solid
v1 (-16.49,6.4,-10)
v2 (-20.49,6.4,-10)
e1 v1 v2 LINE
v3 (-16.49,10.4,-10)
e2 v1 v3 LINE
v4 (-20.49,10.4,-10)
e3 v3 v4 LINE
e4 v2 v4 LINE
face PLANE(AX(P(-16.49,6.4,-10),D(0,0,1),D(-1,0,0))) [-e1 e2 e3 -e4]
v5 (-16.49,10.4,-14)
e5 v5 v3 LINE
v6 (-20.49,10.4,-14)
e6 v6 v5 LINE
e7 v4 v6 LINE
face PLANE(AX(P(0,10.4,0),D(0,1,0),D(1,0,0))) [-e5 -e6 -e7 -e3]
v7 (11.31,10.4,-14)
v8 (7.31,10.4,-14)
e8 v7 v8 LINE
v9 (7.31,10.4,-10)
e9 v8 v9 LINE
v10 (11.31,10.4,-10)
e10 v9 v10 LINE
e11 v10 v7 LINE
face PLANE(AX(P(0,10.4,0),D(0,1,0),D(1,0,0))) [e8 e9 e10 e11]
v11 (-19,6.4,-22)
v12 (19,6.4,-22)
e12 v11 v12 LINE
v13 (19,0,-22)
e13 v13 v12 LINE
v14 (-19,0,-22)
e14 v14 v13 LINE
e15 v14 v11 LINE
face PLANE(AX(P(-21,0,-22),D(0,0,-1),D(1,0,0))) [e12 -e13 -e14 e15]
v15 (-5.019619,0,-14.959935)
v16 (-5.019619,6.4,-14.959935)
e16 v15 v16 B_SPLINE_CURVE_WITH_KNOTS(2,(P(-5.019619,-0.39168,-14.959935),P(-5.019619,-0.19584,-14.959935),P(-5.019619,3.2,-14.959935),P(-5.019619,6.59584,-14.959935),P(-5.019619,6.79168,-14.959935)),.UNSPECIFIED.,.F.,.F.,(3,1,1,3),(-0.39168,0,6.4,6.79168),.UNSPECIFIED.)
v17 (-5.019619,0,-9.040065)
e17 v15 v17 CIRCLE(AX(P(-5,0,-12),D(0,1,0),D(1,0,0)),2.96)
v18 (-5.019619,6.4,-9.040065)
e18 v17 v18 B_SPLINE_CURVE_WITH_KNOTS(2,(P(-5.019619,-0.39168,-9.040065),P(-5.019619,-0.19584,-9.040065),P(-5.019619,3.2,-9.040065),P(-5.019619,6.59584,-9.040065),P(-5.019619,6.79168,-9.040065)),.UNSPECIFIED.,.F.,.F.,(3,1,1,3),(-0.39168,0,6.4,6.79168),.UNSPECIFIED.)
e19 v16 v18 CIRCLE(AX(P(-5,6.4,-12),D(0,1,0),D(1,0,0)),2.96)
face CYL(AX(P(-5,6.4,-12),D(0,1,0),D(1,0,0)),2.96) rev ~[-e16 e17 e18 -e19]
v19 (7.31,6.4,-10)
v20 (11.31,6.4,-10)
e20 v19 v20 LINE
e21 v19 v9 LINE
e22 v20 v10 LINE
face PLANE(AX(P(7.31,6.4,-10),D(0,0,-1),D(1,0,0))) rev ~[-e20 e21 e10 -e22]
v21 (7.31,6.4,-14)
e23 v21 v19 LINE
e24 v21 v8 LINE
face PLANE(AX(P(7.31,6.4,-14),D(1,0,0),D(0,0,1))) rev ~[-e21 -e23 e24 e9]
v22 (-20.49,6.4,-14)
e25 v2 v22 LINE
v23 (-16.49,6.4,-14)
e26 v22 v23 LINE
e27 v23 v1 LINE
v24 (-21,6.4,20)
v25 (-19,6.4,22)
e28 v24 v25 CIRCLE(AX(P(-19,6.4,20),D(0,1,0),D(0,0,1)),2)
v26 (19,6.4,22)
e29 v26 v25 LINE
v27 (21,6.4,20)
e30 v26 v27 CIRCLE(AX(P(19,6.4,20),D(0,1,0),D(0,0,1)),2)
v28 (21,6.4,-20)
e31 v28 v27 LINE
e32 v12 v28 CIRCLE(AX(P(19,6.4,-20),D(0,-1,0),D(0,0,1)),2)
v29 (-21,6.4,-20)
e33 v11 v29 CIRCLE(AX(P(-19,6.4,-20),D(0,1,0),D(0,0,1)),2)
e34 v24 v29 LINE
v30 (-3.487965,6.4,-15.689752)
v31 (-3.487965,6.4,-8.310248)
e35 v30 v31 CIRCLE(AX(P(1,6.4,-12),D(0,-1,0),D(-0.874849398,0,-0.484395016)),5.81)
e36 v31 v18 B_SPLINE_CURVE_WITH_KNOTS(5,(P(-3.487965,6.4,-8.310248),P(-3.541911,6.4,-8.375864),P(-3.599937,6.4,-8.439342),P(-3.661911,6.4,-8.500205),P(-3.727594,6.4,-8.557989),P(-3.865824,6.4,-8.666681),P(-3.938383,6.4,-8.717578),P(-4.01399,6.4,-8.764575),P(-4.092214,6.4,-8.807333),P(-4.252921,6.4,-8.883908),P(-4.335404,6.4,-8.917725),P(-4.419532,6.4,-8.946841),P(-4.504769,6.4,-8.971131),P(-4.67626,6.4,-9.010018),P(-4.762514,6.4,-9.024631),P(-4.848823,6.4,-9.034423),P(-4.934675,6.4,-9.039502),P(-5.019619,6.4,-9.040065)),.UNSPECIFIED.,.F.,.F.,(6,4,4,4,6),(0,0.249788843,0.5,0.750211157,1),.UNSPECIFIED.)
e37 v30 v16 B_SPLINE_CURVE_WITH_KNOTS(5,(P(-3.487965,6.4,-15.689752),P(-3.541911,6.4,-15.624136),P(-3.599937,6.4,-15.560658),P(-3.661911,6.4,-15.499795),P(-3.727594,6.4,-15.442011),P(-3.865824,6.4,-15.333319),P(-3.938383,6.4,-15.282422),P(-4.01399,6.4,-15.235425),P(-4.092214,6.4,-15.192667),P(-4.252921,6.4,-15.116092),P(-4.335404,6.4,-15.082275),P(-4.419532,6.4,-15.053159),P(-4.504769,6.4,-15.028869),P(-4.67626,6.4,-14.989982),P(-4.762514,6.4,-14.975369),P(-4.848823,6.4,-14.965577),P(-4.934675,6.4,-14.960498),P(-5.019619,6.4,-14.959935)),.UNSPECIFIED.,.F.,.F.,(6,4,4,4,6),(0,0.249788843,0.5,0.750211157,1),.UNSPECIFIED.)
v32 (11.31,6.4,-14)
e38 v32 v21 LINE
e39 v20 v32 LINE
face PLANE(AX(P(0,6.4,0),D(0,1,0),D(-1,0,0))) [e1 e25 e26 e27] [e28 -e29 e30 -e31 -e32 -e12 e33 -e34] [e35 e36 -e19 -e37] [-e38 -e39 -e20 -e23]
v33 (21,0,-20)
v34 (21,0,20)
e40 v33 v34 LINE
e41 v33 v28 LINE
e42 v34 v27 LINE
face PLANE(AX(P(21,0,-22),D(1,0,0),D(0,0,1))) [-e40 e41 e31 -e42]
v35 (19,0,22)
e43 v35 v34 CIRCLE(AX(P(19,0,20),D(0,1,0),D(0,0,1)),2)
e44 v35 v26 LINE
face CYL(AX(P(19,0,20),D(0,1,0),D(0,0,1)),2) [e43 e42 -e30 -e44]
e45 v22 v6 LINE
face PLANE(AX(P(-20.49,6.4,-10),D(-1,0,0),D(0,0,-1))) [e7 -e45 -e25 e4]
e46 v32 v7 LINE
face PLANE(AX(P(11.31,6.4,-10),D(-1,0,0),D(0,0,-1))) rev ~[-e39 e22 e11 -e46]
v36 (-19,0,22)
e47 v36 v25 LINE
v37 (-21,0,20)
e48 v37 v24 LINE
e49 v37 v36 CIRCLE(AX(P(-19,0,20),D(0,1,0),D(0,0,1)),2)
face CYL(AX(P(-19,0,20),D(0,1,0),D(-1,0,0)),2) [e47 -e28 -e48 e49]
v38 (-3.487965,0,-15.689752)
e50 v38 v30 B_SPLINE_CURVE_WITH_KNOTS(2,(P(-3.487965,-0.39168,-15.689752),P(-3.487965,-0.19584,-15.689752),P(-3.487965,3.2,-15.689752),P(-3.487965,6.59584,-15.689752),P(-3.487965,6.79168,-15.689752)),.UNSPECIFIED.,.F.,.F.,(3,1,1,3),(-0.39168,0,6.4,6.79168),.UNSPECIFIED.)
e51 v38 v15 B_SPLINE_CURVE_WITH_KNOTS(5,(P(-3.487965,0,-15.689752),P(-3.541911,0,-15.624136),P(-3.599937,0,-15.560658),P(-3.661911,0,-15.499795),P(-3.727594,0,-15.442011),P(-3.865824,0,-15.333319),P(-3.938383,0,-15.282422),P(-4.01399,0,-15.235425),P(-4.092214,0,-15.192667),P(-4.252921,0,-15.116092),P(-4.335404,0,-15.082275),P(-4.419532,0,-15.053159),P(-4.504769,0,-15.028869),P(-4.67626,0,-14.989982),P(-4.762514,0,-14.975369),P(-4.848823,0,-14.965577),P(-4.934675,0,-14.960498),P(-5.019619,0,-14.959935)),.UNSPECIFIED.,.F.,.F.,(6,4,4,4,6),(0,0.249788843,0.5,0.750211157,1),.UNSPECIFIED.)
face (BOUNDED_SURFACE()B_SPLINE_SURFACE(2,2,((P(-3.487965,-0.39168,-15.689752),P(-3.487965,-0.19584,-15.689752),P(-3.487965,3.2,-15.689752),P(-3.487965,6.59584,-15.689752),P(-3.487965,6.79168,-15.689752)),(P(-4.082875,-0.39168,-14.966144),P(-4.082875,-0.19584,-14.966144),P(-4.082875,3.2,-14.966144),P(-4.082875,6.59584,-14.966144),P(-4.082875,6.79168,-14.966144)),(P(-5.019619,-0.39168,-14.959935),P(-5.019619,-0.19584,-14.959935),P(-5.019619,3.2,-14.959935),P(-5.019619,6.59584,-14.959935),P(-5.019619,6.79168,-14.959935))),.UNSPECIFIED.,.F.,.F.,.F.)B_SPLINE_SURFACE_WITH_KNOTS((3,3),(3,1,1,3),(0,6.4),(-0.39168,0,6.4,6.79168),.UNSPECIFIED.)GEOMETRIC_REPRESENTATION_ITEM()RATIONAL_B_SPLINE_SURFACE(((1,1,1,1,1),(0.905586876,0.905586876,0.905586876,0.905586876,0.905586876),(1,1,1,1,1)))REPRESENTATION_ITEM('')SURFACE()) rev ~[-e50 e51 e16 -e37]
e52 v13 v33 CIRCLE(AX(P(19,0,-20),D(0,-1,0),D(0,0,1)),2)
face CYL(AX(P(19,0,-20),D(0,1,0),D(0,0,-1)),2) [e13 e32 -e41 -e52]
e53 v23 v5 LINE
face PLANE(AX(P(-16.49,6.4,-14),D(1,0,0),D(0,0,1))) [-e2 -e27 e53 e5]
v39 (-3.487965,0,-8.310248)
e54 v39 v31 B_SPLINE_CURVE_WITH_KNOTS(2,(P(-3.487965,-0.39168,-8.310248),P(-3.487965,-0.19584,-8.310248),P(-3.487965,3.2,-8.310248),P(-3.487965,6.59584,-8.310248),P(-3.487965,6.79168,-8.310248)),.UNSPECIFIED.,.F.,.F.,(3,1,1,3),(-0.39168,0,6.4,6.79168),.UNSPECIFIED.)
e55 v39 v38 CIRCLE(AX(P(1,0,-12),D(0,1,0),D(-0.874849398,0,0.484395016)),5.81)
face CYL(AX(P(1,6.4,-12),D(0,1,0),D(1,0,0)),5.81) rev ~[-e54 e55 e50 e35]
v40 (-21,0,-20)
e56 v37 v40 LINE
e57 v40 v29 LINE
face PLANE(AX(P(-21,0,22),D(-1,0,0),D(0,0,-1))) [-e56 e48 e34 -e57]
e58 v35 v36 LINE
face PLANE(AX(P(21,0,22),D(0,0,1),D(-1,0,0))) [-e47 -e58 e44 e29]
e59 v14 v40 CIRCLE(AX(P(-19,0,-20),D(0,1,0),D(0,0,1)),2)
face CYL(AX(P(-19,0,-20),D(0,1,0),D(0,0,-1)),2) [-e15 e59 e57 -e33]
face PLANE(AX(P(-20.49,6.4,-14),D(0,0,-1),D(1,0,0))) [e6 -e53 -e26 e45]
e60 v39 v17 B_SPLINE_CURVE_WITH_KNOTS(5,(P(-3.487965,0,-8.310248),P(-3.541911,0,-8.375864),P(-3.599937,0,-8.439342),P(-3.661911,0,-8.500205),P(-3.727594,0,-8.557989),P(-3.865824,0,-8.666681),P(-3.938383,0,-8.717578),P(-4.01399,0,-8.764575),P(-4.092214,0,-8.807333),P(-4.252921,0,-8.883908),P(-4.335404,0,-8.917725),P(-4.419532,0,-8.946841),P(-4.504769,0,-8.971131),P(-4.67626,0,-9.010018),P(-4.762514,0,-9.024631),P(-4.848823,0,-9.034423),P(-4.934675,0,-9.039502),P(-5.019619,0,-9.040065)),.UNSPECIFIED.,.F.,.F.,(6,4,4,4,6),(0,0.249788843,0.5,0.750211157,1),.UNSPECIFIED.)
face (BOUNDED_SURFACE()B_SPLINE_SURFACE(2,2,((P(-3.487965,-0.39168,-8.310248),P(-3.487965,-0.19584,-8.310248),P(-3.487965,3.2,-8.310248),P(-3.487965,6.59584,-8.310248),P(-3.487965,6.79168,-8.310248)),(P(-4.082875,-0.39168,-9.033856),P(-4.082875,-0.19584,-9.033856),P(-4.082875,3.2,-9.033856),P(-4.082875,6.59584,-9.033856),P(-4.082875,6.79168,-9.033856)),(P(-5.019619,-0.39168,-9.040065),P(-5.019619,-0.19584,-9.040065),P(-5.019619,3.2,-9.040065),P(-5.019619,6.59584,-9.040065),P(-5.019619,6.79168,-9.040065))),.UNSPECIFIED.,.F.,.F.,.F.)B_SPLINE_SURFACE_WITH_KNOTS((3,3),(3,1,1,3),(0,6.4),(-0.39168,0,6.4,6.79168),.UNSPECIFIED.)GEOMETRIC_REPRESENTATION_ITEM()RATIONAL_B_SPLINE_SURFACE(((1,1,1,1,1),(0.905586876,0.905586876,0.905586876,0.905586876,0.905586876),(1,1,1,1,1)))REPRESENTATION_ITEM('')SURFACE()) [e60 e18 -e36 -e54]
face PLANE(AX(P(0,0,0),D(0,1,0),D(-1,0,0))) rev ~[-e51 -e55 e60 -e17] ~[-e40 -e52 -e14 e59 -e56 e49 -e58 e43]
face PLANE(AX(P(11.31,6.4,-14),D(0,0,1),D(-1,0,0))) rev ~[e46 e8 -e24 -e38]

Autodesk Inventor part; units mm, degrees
ref_plane "YZ Plane" through (0, 0, 0) normal (1, 0, 0) x (0, 1, 0)
ref_plane "XZ Plane" through (0, 0, 0) normal (0, 1, 0) x (-1, 0, 0)
ref_plane "XY Plane" through (0, 0, 0) normal (0, 0, 1) x (1, 0, 0)
sketch "Sketch1" plane through (0, 0, 0) normal (0, 1, 0) x (-1, 0, 0)
  line L0 (-21, 22) -> (21, 22)
  line L1 (21, 22) -> (21, -22)
  line L2 (21, -22) -> (-21, -22)
  line L3 (-21, -22) -> (-21, 22)
  line L4 (-21, 22) -> (21, -22) construction
  line L5 (21, 22) -> (-21, -22) construction
  point P0 (0, 0)
  dimension "d0" = 42
  dimension "d1" = 44
extrude "wall2" add sketch "Sketch1" along normal blind 6.4
sketch "Sketch7" plane through (0, 6.4, 0) normal (0, 1, 0) x (1, 0, 0)
  line L0 (1, -22) -> (1, 22) construction
  line L1 (21, 22) -> (-21, 22) projected
  line L2 (-21, -22) -> (21, -22) projected
  line L3 (-21, 12) -> (21, 12) construction
  line L4 (21, -22) -> (21, 22) projected
  line L5 (-21, 22) -> (-21, -22) projected
  circle A0 centre (1, 12) radius 5.81
  point P0 (0, 0)
  dimension "d74" = 34
  dimension "d75" = 22
  dimension "d76" = 11.6
extrude "bigcircle" cut sketch "Sketch7" against normal blind 6.4 contours A0
sketch "Sketch8" plane through (0, 6.4, 0) normal (0, 1, 0) x (1, 0, 0)
  line L0 (-21, -22) -> (-21, 22) projected
  line L1 (-21, 12) -> (21, 12) construction
  line L2 (21, 22) -> (21, -22) projected
  line L3 (1, 22) -> (1, -22) construction
  line L4 (21, -22) -> (21, 22) projected
  line L5 (21, 22) -> (-21, 22) projected
  line L6 (-21, -22) -> (21, -22) projected
  circle A0 centre (-5, 12) radius 2.96
  point P0 (0, 0)
  dimension "d81" = 22
  dimension "d82" = 34
  dimension "d83" = 5.9
  dimension "d84" = 6
extrude "smallcircle" cut sketch "Sketch8" against normal blind 6.4 contours A0
fillet "Fillet4" radius 2 2 edges at (-4.0829, 3.2, -9.1857) (-4.0829, 3.2, -14.8143)
fillet_without_effect "Fillet5"
fillet "Fillet6" radius 2 1 edges at (-21, 3.2, -22)
fillet "Fillet7" radius 2 1 edges at (21, 3.2, -22)
fillet "Fillet8" radius 2 1 edges at (-21, 3.2, 22)
fillet "Fillet9" radius 2 1 edges at (21, 3.2, 22)
sketch "Sketch9" plane through (0, 6.4, 0) normal (0, 1, 0) x (1, 0, 0)
  line L0 (7.31, 17.1525) -> (7.31, -6.1616) construction
  line L1 (6.81, 14.2171) -> (6.81, 9.0836) construction
  arc A0 (-3.488, 8.3102) -> (-3.488, 15.6898) centre (1, 12) ccw projected
  line L2 (-21, 12) -> (14.6779, 12) construction
  line L3 (7.31, 10) -> (11.31, 10)
  line L4 (11.31, 10) -> (11.31, 14)
  line L5 (11.31, 14) -> (7.31, 14)
  line L6 (7.31, 14) -> (7.31, 10)
  line L7 (7.31, 10) -> (11.31, 14) construction
  line L8 (11.31, 10) -> (7.31, 14) construction
  line L9 (-21, 20) -> (-21, -20) projected
  line L10 (-20.49, 14) -> (-16.49, 14)
  line L11 (-16.49, 14) -> (-16.49, 10)
  line L12 (-16.49, 10) -> (-20.49, 10)
  line L13 (-20.49, 10) -> (-20.49, 14)
  line L14 (-20.49, 14) -> (-16.49, 10) construction
  line L15 (-16.49, 14) -> (-20.49, 10) construction
  point P0 (0, 0)
  point P1 (9.31, 12)
  point P2 (-18.49, 12)
  dimension "d93" = 0.5
  dimension "d94" = 4
  dimension "d95" = 23.3
extrude "Extrusion7" add sketch "Sketch9" along normal blind 4
equation "\"d0\" = wallw"
equation "\"d1\" = wallh"
equation "\"d72\" = wall2_thick"
equation "\"d74\" = distancefrombottom"
equation "\"d75\" = distancefromleft"
equation "\"d76\" = servobigcircledia"
equation "\"d79\" = wall2_thick"
equation "\"d81\" = distancefromleft"
equation "\"d82\" = distancefrombottom"
equation "\"d83\" = servosmallcircledia"
equation "\"d85\" = wall2_thick"
equation "\"d89\" = cornerrad"
equation "\"d90\" = cornerrad"
equation "\"d91\" = cornerrad"
equation "\"d92\" = cornerrad"
equation "\"d94\" = servomountsquare"
equation "\"d96\" = servomounth"
equation "\"printer3dtolerance\" = 0.1"
equation "\"wallw\" = 42"
equation "\"wallh\" = 44"
equation "\"cornerrad\" = 2"
equation "\"baseextra\" = 2"
equation "\"wall1_thick\" = 8"
equation "\"wall2_thick\" = 6.4"
equation "\"wall3_thick\" = 4"
equation "\"wall1slot\" = 8.1"
equation "\"wall2slot\" = 6.5"
equation "\"wall3slot\" = 4.1"
equation "\"gap2\" = 28"
equation "\"baseh\" = 79"
equation "\"basew\" = 44"
equation "\"base_thick\" = 6"
equation "\"base_slots_depth\" = 4"
equation "\"servomounth\" = 4"
equation "\"servosmallcircledia\" = 5.9"
equation "\"servomountsquare\" = 4"
equation "\"servobigcircledia\" = 11.6"
equation "\"servo9gw\" = 22.8"
equation "\"distancefromleft\" = 22"
equation "\"servopolygonl\" = 5.9"
equation "\"servopolygonr\" = 6.1"
equation "\"distancefrombottom\" = 34"
equation "\"d49\" = distancefrombottom"
equation "\"adapterh\" = 16"
equation "\"wall3slotd\" = 2"
equation "\"adapterw\" = 32"
equation "\"wall3slotd_1\" = 2"
equation "\"wall3slotw\" = 36"
equation "\"armslotd\" = 2"
equation "\"armthick\" = 3"
equation "\"armw\" = 34"
equation "\"fanhb\" = 11"
equation "\"fanhs\" = 9.6"
equation "\"adapterwallthick\" = 6"
equation "\"adapterwallslotd\" = 2"
equation "\"armhornthick\" = 3"
equation "\"hornscrewholed\" = 2"
equation "\"hornscrewheadd\" = 3"
equation "\"hornthick\" = 1.5"
properties part number "wall-middle" material "Wood (Oak)"
